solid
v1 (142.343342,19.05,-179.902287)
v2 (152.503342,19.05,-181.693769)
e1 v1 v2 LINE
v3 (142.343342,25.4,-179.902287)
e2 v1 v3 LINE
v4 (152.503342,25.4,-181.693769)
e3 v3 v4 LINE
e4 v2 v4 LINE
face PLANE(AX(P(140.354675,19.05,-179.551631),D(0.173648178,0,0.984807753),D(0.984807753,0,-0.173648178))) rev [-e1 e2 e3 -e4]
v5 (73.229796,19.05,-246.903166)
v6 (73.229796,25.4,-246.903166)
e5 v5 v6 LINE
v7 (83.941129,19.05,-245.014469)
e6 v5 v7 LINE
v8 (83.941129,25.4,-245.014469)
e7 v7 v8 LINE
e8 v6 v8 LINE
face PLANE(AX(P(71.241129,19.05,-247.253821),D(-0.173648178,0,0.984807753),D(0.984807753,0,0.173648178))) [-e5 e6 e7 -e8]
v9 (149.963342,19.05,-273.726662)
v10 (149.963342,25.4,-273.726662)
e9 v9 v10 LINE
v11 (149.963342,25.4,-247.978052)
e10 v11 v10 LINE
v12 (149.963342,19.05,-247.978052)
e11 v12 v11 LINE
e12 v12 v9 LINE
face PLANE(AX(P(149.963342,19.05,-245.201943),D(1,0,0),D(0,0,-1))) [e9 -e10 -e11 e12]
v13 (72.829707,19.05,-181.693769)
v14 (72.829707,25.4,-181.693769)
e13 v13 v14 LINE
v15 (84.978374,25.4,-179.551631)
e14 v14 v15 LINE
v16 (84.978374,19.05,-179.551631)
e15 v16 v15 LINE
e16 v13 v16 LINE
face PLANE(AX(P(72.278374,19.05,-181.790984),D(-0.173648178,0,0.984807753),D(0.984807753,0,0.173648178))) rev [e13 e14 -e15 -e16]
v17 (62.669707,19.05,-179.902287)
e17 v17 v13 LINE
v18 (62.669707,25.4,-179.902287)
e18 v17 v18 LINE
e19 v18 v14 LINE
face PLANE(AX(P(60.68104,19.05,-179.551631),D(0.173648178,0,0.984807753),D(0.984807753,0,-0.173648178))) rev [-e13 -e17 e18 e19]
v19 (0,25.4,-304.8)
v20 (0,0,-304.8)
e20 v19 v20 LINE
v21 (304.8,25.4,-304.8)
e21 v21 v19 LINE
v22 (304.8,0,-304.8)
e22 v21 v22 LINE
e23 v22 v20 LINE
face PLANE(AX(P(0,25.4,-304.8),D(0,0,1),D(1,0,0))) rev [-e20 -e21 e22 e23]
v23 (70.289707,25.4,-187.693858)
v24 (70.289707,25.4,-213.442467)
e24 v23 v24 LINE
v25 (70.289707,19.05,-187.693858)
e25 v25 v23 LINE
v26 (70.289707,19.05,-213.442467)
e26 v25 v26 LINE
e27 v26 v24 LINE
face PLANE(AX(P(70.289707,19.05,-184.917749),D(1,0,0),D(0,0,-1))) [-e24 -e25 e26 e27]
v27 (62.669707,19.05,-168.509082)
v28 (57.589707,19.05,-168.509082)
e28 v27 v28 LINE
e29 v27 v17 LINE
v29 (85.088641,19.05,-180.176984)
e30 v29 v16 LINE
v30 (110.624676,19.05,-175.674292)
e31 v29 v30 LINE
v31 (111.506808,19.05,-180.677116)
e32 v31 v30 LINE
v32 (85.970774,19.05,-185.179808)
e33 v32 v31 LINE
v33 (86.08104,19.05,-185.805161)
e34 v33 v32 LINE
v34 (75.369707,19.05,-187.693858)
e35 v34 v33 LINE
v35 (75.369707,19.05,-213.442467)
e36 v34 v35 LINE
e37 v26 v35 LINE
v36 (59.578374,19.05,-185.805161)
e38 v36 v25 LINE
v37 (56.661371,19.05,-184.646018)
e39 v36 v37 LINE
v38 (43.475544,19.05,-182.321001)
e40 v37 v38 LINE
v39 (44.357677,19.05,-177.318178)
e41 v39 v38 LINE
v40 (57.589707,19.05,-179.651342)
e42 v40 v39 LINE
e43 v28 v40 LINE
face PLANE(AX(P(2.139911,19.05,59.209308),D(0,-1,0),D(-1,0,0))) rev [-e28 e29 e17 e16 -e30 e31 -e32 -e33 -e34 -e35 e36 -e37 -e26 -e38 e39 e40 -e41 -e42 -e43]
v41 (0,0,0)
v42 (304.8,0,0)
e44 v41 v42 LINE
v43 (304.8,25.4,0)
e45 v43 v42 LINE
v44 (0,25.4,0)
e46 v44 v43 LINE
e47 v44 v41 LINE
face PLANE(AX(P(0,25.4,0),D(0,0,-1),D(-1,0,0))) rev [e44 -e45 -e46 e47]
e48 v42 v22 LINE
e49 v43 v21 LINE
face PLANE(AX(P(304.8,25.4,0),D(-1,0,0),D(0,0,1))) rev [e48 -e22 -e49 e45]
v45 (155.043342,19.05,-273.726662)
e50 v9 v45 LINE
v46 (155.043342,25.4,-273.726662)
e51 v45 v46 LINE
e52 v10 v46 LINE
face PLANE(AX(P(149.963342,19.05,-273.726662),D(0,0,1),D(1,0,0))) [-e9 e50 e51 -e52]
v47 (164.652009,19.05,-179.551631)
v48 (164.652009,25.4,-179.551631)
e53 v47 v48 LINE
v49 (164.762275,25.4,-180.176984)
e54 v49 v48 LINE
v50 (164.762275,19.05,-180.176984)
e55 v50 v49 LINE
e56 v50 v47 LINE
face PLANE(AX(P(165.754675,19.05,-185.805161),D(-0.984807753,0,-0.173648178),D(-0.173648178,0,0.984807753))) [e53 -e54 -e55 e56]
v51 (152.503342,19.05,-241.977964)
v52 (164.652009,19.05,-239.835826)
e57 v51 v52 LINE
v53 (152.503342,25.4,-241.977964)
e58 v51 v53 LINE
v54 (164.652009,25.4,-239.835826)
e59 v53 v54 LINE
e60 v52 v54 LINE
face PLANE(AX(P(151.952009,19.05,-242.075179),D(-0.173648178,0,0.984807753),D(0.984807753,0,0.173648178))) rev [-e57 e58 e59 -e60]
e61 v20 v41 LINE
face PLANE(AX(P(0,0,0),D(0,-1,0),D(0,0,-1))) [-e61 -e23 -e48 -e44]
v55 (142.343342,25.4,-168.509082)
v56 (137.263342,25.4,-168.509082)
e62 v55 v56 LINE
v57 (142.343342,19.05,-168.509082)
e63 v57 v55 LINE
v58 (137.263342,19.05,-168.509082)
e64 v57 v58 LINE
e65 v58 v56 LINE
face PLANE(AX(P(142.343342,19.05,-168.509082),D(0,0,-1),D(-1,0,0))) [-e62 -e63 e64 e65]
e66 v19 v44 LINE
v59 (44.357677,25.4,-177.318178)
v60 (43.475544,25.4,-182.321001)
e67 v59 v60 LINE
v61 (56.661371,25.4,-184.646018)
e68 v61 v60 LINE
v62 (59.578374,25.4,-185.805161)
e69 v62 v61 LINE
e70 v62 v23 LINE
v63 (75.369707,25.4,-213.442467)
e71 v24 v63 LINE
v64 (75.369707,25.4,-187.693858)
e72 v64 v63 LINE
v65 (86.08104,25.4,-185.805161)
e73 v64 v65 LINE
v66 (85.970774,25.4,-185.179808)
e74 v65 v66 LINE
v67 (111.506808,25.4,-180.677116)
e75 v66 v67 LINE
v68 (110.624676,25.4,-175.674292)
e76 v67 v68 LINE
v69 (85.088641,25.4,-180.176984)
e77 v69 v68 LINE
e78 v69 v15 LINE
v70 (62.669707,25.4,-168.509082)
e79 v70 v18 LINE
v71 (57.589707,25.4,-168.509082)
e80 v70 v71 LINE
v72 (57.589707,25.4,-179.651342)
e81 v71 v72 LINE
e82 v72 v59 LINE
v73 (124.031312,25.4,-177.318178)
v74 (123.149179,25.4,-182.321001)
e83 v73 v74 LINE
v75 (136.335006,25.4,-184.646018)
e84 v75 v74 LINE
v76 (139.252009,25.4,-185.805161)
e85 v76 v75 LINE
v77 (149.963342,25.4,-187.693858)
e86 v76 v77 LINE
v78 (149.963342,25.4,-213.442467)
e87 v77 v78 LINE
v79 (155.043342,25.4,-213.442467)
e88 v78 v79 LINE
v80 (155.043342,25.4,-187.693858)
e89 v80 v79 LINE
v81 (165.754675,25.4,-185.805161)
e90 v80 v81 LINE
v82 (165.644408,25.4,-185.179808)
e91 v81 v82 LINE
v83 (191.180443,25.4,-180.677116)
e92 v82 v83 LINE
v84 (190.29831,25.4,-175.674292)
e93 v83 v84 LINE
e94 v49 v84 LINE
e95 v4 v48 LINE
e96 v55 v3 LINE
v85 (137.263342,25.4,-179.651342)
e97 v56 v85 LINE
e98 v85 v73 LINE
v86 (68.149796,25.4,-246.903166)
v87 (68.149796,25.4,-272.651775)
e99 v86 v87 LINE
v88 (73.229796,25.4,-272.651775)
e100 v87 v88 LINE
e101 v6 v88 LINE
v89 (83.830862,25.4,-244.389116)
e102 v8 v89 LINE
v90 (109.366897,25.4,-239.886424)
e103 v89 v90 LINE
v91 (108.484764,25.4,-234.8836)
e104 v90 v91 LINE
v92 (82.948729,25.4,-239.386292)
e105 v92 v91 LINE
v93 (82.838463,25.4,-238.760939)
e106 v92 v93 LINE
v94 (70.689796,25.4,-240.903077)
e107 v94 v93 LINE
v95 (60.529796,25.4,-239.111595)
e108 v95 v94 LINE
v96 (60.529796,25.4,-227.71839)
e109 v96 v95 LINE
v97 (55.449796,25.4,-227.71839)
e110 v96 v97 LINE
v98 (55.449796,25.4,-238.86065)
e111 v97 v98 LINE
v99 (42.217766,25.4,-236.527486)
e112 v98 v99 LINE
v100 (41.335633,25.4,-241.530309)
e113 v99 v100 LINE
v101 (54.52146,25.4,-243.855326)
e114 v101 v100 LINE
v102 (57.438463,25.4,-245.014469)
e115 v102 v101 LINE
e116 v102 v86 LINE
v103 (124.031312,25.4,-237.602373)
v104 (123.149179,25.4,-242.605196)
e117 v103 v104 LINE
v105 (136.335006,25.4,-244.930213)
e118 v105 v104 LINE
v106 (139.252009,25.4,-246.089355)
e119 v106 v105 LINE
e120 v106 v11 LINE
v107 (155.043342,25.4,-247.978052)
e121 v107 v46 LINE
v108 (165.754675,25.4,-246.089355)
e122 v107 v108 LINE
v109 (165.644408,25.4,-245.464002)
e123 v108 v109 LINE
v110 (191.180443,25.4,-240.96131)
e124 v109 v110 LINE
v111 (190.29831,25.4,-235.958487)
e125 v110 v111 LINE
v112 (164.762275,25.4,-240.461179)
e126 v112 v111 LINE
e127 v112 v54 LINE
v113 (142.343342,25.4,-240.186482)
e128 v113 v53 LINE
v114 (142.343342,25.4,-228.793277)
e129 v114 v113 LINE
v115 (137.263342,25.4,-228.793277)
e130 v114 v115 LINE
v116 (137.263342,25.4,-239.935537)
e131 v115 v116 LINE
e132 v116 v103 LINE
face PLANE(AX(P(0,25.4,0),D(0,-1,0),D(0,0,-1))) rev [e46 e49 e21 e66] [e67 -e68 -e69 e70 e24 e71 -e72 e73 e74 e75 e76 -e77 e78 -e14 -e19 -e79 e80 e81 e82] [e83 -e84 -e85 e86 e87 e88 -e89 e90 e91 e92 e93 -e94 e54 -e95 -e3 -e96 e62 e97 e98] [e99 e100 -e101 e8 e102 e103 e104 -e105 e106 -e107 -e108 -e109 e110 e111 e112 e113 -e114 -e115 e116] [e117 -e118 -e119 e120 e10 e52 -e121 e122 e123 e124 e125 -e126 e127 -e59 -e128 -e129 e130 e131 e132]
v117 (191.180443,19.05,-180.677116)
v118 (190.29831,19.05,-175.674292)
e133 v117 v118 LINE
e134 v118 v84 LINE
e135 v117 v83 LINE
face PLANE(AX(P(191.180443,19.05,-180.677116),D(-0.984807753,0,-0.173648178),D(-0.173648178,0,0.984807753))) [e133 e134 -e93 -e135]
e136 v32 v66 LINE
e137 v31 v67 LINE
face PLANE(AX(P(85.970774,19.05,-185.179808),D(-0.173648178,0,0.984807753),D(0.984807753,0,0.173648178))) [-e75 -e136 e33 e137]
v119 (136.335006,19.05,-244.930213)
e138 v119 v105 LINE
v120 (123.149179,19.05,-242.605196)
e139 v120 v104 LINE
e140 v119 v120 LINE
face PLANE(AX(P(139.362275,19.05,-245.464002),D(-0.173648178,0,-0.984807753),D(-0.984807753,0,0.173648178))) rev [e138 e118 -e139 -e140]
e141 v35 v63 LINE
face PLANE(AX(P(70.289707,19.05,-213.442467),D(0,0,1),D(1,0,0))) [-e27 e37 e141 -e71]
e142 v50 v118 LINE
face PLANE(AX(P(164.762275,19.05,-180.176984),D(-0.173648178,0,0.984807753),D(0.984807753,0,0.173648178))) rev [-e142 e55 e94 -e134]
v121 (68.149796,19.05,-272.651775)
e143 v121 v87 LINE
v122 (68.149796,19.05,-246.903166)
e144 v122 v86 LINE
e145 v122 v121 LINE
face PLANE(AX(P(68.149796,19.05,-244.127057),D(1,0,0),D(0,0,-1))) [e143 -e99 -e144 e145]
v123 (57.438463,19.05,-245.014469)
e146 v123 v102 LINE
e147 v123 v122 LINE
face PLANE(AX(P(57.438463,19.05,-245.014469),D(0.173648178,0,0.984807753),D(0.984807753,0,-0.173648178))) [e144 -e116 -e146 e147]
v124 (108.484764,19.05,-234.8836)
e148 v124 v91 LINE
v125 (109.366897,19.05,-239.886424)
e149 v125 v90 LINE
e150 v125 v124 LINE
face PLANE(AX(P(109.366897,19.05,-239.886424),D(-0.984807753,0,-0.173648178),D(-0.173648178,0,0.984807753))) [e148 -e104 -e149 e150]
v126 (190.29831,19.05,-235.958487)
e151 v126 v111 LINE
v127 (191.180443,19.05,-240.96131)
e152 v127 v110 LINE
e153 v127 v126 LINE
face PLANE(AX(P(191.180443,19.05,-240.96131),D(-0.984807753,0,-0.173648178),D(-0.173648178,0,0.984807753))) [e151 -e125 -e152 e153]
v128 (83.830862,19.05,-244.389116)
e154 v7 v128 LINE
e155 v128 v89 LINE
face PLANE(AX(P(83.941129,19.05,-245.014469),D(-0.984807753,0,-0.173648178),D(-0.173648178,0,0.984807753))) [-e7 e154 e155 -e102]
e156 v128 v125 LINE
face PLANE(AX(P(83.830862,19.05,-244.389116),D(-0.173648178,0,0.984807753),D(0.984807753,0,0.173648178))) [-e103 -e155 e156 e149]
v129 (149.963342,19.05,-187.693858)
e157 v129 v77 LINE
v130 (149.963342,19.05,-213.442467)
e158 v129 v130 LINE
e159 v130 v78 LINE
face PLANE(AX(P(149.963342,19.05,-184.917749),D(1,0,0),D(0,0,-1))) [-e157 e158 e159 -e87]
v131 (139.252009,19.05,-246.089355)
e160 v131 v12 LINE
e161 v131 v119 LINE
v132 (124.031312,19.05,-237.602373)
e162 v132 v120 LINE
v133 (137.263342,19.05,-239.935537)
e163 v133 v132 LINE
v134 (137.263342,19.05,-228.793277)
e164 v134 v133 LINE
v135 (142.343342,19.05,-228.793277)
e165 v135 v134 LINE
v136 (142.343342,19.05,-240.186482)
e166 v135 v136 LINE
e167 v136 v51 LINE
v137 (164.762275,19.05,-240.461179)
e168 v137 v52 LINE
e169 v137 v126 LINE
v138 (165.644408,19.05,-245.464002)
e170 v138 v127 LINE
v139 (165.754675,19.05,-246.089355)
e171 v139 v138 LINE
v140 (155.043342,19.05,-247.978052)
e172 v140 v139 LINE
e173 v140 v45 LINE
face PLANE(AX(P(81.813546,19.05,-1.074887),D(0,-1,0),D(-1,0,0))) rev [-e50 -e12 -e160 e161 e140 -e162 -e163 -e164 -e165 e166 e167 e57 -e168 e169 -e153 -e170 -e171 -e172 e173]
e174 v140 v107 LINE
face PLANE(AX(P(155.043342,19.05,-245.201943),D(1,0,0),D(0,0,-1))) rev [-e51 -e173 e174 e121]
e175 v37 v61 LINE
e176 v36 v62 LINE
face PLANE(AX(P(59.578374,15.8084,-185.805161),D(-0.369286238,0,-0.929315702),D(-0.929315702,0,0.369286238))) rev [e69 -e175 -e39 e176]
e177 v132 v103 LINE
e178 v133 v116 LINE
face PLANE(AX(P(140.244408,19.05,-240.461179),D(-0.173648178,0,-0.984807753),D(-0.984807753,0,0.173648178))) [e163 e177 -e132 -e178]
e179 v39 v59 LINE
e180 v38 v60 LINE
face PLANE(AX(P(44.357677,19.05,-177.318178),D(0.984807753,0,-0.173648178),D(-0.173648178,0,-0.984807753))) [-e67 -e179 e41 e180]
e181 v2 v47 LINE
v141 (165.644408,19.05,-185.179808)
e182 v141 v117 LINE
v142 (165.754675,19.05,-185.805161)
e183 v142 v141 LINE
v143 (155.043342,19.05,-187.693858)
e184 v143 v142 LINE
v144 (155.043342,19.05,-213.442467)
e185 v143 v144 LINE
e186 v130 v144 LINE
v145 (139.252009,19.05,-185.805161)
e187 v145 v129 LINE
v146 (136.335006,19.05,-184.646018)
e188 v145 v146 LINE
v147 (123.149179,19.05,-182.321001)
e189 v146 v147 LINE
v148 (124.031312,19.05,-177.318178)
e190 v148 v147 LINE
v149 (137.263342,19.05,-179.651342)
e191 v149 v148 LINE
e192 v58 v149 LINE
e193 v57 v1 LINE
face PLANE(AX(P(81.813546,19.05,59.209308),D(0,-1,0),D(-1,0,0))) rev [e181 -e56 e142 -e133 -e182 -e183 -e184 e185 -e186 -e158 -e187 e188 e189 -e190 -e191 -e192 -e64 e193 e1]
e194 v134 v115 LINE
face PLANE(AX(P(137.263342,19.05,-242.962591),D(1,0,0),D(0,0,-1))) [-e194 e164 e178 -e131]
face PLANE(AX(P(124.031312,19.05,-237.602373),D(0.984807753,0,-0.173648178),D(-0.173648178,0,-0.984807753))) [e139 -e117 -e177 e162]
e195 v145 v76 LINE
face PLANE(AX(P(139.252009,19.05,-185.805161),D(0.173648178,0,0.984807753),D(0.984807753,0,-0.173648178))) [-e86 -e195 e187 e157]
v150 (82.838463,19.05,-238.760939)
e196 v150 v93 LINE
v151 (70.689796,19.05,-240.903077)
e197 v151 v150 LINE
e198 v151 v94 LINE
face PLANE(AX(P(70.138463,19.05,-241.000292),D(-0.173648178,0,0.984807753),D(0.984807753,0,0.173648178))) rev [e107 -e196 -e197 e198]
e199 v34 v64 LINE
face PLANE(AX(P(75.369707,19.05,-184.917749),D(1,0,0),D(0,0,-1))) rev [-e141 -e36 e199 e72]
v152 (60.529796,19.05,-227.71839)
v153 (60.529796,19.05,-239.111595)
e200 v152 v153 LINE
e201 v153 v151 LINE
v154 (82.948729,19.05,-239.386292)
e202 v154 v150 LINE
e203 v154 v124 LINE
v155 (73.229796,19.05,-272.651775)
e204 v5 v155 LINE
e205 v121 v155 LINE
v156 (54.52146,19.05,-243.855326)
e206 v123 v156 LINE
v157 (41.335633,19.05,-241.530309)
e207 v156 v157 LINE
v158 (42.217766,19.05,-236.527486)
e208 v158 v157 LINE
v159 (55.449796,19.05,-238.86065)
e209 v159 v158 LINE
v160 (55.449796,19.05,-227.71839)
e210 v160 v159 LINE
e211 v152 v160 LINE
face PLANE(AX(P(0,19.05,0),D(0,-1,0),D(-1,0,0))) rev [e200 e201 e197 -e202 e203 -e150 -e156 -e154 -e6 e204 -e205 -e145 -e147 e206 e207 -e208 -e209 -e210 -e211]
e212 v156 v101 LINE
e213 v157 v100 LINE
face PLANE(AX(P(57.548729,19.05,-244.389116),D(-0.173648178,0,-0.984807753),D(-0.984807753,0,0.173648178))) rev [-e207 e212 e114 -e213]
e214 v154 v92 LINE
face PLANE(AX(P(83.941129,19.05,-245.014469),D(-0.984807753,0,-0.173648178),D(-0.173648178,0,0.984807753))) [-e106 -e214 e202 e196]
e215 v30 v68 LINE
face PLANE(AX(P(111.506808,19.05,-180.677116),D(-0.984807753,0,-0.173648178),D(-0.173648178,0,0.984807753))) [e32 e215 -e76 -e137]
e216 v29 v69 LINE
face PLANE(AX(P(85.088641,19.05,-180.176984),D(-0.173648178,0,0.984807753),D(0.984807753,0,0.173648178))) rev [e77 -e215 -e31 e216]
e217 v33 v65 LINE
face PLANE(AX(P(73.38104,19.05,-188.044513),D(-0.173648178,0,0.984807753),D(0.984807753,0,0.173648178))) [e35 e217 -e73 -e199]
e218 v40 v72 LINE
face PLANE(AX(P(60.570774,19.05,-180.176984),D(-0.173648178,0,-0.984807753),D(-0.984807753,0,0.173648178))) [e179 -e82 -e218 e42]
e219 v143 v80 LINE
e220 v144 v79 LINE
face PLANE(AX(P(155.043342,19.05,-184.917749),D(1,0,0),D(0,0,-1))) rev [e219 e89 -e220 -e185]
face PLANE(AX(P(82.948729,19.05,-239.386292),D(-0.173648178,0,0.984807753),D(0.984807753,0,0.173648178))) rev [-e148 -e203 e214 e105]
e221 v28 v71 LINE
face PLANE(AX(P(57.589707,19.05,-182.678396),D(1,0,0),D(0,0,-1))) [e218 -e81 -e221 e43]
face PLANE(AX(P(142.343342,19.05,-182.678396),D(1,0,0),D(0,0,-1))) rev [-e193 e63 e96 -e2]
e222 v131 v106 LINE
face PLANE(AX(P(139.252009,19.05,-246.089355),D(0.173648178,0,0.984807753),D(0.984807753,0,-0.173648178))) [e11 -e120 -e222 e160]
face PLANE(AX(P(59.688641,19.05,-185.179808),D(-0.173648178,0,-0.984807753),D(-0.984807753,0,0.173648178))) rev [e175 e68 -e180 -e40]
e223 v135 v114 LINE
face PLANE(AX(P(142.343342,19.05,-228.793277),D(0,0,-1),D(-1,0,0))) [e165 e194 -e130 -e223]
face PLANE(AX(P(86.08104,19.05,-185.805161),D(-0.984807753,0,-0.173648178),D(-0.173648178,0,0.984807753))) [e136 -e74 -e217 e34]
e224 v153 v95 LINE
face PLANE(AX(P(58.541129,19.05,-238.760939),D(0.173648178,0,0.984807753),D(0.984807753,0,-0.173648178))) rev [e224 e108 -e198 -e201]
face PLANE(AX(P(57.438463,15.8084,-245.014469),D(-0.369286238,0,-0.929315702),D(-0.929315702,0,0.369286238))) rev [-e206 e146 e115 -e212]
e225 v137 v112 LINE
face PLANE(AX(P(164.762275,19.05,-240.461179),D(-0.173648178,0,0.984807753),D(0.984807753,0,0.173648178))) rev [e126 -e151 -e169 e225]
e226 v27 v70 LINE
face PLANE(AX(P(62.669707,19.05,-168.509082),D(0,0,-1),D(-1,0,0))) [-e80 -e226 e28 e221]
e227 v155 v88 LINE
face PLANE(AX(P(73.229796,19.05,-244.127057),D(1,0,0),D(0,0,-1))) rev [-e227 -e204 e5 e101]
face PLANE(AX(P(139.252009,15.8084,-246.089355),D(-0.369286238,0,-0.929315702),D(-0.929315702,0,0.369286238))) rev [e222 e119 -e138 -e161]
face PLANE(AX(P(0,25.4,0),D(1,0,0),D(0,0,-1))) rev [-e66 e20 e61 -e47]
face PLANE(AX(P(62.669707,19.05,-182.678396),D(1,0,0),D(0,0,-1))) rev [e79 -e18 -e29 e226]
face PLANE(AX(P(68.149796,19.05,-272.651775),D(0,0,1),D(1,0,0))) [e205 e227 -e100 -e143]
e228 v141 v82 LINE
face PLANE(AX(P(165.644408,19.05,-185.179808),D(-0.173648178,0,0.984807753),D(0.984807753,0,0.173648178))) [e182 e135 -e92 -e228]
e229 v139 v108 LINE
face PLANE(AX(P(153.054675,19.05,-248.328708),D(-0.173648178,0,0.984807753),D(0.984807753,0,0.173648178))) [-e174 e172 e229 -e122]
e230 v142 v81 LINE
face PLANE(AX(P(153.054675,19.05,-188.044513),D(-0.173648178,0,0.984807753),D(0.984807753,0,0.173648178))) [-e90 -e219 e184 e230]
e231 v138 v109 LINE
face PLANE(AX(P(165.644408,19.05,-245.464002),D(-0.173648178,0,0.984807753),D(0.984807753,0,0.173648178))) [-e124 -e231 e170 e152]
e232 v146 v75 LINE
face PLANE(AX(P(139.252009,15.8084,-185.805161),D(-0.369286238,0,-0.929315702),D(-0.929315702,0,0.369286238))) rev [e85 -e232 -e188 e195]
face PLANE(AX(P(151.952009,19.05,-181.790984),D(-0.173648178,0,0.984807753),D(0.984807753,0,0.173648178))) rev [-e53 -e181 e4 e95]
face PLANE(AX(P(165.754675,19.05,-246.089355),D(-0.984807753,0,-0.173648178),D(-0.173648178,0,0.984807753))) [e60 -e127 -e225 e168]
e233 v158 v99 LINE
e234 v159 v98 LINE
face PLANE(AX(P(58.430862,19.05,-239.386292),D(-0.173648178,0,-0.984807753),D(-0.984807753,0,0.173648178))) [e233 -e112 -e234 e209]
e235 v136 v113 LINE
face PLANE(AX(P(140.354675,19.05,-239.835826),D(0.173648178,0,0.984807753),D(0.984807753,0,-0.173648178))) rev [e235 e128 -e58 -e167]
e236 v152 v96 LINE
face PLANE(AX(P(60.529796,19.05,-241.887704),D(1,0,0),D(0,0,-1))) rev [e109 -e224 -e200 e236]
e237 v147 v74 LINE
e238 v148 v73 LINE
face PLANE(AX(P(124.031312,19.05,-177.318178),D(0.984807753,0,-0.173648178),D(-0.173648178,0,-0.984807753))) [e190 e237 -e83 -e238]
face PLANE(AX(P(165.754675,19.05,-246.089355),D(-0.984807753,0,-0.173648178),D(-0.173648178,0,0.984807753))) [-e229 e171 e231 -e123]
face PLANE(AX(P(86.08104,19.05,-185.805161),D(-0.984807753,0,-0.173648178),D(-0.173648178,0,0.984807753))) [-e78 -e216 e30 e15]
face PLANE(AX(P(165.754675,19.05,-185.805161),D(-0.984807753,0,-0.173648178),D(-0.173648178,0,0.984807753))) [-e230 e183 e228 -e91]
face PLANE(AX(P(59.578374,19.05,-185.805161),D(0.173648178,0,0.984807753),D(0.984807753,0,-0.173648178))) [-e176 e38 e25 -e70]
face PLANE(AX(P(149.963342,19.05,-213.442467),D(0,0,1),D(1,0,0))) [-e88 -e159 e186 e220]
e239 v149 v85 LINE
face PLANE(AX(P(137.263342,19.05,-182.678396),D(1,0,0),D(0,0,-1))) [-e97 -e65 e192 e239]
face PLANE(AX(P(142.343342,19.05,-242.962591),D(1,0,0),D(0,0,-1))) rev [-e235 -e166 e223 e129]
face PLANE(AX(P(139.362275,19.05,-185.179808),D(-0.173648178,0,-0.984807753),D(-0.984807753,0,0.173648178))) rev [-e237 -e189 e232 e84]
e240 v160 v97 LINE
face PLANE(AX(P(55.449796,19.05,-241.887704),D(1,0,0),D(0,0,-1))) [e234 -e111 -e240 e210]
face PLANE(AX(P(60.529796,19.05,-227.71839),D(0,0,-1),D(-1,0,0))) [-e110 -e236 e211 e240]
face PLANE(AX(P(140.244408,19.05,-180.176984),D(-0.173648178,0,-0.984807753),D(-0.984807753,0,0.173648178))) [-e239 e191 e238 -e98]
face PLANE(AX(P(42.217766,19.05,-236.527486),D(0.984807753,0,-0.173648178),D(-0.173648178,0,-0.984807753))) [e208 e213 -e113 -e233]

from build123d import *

# Parameters (mm, degrees)
SKETCH2_W               = 304.8
SKETCH2_H               = 304.8
BOSS_EXTRUDE1_DEPTH     = 25.4
CUT_EXTRUDE_THIN1_DEPTH = 6.35
SKETCH4_W               = 5.08
SKETCH4_H               = 28.524718884
CUT_EXTRUDE_THIN3_DEPTH = 6.35
CUT_EXTRUDE1_START      = -6.35
CUT_EXTRUDE1_DEPTH      = 6.35
SKETCH_PATTERN1_START   = 19.05
SKETCH_PATTERN1_DEPTH   = 6.35


# Read off the part's stored shape, not the designer's step: Sketch-Pattern1
with BuildPart() as part:
    # Sketch2 → Boss-Extrude1 (new body)
    with BuildSketch(Plane(origin=(0, 0, 0), x_dir=(1, 0, 0), z_dir=(0, 1, 0))):
        with Locations((152.4, 152.4)):
            Rectangle(SKETCH2_W, SKETCH2_H)
    extrude(amount=BOSS_EXTRUDE1_DEPTH)

    # Sketch3 → Cut-Extrude-Thin1 (cut)
    with BuildSketch(Plane(origin=(0, 25.4, 0), x_dir=(1, 0, 0), z_dir=(0, 1, 0))):
        Polygon((58.541128736, 238.760939297), (70.689795772, 240.903077075), (82.838462808, 238.760939297), (83.941128736, 245.014468529), (70.689795772, 247.351036061), (57.438462808, 245.014468529), align=None)
    extrude(amount=-CUT_EXTRUDE_THIN1_DEPTH, mode=Mode.SUBTRACT)

    # Sketch4 → Cut-Extrude-Thin3 (cut)
    with BuildSketch(Plane(origin=(0, 25.4, 0), x_dir=(1, 0, 0), z_dir=(0, 1, 0))):
        Polygon((42.217765698, 236.527485876), (55.449795772, 238.860649788), (55.449795772, 227.718390038), (60.529795772, 227.718390038), (60.529795772, 244.914758038), (41.335632956, 241.530309262), align=None)
        with Locations((70.689795772, 258.38941601)):
            Rectangle(SKETCH4_W, SKETCH4_H)
        Polygon((82.948729401, 239.38629222), (108.484764207, 234.883600304), (109.36689695, 239.886423689), (83.830862143, 244.389115606), align=None)
    extrude(amount=-CUT_EXTRUDE_THIN3_DEPTH, mode=Mode.SUBTRACT)

    # Sketch6 → Cut-Extrude1 (cut)
    with BuildSketch(Plane(origin=(0, 25.4, 0), x_dir=(1, 0, 0), z_dir=(0, 1, 0)).offset(CUT_EXTRUDE1_START)):
        Polygon((57.438462808, 245.014468529), (54.521459745, 243.855326287), (57.548729401, 244.389115606), align=None)
    extrude(amount=CUT_EXTRUDE1_DEPTH, mode=Mode.SUBTRACT)

    # Sketch-Pattern1 outline → Sketch-Pattern1 (cut)
    with BuildSketch(Plane(origin=(0, 0, 0), x_dir=(1, 0, 0), z_dir=(0, 1, 0)).offset(SKETCH_PATTERN1_START)):
        Polygon((165.644408099, 185.179807617), (165.754674692, 185.80516054), (155.043341728, 187.693857541), (155.043341728, 213.442467463), (149.963341728, 213.442467463), (149.963341728, 187.693857541), (139.252008764, 185.80516054), (136.335005701, 184.646018299), (123.149178912, 182.321001273), (124.031311655, 177.318177888), (137.263341728, 179.651341799), (137.263341728, 168.509082049), (142.343341728, 168.509082049), (142.343341728, 179.902286963), (152.503341728, 181.693769087), (164.652008764, 179.551631308), (164.762275357, 180.176984232), (190.298310163, 175.674292315), (191.180442906, 180.6771157), align=None)
        Polygon((165.644408099, 245.46400238), (165.754674692, 246.089355303), (155.043341728, 247.978052304), (155.043341728, 273.726662226), (149.963341728, 273.726662226), (149.963341728, 247.978052304), (139.252008764, 246.089355303), (136.335005701, 244.930213062), (123.149178912, 242.605196036), (124.031311655, 237.60237265), (137.263341728, 239.935536562), (137.263341728, 228.793276812), (142.343341728, 228.793276812), (142.343341728, 240.186481725), (152.503341728, 241.977963849), (164.652008764, 239.835826071), (164.762275357, 240.461178994), (190.298310163, 235.958487078), (191.180442906, 240.961310463), align=None)
        Polygon((85.970773635, 185.179807617), (86.081040228, 185.80516054), (75.369707264, 187.693857541), (75.369707264, 213.442467463), (70.289707264, 213.442467463), (70.289707264, 187.693857541), (59.578374299, 185.80516054), (56.661371236, 184.646018299), (43.475544447, 182.321001273), (44.35767719, 177.318177888), (57.589707264, 179.651341799), (57.589707264, 168.509082049), (62.669707264, 168.509082049), (62.669707264, 179.902286963), (72.829707264, 181.693769087), (84.978374299, 179.551631308), (85.088640892, 180.176984232), (110.624675699, 175.674292315), (111.506808441, 180.6771157), align=None)
    extrude(amount=SKETCH_PATTERN1_DEPTH, mode=Mode.SUBTRACT)


solid = part.part
